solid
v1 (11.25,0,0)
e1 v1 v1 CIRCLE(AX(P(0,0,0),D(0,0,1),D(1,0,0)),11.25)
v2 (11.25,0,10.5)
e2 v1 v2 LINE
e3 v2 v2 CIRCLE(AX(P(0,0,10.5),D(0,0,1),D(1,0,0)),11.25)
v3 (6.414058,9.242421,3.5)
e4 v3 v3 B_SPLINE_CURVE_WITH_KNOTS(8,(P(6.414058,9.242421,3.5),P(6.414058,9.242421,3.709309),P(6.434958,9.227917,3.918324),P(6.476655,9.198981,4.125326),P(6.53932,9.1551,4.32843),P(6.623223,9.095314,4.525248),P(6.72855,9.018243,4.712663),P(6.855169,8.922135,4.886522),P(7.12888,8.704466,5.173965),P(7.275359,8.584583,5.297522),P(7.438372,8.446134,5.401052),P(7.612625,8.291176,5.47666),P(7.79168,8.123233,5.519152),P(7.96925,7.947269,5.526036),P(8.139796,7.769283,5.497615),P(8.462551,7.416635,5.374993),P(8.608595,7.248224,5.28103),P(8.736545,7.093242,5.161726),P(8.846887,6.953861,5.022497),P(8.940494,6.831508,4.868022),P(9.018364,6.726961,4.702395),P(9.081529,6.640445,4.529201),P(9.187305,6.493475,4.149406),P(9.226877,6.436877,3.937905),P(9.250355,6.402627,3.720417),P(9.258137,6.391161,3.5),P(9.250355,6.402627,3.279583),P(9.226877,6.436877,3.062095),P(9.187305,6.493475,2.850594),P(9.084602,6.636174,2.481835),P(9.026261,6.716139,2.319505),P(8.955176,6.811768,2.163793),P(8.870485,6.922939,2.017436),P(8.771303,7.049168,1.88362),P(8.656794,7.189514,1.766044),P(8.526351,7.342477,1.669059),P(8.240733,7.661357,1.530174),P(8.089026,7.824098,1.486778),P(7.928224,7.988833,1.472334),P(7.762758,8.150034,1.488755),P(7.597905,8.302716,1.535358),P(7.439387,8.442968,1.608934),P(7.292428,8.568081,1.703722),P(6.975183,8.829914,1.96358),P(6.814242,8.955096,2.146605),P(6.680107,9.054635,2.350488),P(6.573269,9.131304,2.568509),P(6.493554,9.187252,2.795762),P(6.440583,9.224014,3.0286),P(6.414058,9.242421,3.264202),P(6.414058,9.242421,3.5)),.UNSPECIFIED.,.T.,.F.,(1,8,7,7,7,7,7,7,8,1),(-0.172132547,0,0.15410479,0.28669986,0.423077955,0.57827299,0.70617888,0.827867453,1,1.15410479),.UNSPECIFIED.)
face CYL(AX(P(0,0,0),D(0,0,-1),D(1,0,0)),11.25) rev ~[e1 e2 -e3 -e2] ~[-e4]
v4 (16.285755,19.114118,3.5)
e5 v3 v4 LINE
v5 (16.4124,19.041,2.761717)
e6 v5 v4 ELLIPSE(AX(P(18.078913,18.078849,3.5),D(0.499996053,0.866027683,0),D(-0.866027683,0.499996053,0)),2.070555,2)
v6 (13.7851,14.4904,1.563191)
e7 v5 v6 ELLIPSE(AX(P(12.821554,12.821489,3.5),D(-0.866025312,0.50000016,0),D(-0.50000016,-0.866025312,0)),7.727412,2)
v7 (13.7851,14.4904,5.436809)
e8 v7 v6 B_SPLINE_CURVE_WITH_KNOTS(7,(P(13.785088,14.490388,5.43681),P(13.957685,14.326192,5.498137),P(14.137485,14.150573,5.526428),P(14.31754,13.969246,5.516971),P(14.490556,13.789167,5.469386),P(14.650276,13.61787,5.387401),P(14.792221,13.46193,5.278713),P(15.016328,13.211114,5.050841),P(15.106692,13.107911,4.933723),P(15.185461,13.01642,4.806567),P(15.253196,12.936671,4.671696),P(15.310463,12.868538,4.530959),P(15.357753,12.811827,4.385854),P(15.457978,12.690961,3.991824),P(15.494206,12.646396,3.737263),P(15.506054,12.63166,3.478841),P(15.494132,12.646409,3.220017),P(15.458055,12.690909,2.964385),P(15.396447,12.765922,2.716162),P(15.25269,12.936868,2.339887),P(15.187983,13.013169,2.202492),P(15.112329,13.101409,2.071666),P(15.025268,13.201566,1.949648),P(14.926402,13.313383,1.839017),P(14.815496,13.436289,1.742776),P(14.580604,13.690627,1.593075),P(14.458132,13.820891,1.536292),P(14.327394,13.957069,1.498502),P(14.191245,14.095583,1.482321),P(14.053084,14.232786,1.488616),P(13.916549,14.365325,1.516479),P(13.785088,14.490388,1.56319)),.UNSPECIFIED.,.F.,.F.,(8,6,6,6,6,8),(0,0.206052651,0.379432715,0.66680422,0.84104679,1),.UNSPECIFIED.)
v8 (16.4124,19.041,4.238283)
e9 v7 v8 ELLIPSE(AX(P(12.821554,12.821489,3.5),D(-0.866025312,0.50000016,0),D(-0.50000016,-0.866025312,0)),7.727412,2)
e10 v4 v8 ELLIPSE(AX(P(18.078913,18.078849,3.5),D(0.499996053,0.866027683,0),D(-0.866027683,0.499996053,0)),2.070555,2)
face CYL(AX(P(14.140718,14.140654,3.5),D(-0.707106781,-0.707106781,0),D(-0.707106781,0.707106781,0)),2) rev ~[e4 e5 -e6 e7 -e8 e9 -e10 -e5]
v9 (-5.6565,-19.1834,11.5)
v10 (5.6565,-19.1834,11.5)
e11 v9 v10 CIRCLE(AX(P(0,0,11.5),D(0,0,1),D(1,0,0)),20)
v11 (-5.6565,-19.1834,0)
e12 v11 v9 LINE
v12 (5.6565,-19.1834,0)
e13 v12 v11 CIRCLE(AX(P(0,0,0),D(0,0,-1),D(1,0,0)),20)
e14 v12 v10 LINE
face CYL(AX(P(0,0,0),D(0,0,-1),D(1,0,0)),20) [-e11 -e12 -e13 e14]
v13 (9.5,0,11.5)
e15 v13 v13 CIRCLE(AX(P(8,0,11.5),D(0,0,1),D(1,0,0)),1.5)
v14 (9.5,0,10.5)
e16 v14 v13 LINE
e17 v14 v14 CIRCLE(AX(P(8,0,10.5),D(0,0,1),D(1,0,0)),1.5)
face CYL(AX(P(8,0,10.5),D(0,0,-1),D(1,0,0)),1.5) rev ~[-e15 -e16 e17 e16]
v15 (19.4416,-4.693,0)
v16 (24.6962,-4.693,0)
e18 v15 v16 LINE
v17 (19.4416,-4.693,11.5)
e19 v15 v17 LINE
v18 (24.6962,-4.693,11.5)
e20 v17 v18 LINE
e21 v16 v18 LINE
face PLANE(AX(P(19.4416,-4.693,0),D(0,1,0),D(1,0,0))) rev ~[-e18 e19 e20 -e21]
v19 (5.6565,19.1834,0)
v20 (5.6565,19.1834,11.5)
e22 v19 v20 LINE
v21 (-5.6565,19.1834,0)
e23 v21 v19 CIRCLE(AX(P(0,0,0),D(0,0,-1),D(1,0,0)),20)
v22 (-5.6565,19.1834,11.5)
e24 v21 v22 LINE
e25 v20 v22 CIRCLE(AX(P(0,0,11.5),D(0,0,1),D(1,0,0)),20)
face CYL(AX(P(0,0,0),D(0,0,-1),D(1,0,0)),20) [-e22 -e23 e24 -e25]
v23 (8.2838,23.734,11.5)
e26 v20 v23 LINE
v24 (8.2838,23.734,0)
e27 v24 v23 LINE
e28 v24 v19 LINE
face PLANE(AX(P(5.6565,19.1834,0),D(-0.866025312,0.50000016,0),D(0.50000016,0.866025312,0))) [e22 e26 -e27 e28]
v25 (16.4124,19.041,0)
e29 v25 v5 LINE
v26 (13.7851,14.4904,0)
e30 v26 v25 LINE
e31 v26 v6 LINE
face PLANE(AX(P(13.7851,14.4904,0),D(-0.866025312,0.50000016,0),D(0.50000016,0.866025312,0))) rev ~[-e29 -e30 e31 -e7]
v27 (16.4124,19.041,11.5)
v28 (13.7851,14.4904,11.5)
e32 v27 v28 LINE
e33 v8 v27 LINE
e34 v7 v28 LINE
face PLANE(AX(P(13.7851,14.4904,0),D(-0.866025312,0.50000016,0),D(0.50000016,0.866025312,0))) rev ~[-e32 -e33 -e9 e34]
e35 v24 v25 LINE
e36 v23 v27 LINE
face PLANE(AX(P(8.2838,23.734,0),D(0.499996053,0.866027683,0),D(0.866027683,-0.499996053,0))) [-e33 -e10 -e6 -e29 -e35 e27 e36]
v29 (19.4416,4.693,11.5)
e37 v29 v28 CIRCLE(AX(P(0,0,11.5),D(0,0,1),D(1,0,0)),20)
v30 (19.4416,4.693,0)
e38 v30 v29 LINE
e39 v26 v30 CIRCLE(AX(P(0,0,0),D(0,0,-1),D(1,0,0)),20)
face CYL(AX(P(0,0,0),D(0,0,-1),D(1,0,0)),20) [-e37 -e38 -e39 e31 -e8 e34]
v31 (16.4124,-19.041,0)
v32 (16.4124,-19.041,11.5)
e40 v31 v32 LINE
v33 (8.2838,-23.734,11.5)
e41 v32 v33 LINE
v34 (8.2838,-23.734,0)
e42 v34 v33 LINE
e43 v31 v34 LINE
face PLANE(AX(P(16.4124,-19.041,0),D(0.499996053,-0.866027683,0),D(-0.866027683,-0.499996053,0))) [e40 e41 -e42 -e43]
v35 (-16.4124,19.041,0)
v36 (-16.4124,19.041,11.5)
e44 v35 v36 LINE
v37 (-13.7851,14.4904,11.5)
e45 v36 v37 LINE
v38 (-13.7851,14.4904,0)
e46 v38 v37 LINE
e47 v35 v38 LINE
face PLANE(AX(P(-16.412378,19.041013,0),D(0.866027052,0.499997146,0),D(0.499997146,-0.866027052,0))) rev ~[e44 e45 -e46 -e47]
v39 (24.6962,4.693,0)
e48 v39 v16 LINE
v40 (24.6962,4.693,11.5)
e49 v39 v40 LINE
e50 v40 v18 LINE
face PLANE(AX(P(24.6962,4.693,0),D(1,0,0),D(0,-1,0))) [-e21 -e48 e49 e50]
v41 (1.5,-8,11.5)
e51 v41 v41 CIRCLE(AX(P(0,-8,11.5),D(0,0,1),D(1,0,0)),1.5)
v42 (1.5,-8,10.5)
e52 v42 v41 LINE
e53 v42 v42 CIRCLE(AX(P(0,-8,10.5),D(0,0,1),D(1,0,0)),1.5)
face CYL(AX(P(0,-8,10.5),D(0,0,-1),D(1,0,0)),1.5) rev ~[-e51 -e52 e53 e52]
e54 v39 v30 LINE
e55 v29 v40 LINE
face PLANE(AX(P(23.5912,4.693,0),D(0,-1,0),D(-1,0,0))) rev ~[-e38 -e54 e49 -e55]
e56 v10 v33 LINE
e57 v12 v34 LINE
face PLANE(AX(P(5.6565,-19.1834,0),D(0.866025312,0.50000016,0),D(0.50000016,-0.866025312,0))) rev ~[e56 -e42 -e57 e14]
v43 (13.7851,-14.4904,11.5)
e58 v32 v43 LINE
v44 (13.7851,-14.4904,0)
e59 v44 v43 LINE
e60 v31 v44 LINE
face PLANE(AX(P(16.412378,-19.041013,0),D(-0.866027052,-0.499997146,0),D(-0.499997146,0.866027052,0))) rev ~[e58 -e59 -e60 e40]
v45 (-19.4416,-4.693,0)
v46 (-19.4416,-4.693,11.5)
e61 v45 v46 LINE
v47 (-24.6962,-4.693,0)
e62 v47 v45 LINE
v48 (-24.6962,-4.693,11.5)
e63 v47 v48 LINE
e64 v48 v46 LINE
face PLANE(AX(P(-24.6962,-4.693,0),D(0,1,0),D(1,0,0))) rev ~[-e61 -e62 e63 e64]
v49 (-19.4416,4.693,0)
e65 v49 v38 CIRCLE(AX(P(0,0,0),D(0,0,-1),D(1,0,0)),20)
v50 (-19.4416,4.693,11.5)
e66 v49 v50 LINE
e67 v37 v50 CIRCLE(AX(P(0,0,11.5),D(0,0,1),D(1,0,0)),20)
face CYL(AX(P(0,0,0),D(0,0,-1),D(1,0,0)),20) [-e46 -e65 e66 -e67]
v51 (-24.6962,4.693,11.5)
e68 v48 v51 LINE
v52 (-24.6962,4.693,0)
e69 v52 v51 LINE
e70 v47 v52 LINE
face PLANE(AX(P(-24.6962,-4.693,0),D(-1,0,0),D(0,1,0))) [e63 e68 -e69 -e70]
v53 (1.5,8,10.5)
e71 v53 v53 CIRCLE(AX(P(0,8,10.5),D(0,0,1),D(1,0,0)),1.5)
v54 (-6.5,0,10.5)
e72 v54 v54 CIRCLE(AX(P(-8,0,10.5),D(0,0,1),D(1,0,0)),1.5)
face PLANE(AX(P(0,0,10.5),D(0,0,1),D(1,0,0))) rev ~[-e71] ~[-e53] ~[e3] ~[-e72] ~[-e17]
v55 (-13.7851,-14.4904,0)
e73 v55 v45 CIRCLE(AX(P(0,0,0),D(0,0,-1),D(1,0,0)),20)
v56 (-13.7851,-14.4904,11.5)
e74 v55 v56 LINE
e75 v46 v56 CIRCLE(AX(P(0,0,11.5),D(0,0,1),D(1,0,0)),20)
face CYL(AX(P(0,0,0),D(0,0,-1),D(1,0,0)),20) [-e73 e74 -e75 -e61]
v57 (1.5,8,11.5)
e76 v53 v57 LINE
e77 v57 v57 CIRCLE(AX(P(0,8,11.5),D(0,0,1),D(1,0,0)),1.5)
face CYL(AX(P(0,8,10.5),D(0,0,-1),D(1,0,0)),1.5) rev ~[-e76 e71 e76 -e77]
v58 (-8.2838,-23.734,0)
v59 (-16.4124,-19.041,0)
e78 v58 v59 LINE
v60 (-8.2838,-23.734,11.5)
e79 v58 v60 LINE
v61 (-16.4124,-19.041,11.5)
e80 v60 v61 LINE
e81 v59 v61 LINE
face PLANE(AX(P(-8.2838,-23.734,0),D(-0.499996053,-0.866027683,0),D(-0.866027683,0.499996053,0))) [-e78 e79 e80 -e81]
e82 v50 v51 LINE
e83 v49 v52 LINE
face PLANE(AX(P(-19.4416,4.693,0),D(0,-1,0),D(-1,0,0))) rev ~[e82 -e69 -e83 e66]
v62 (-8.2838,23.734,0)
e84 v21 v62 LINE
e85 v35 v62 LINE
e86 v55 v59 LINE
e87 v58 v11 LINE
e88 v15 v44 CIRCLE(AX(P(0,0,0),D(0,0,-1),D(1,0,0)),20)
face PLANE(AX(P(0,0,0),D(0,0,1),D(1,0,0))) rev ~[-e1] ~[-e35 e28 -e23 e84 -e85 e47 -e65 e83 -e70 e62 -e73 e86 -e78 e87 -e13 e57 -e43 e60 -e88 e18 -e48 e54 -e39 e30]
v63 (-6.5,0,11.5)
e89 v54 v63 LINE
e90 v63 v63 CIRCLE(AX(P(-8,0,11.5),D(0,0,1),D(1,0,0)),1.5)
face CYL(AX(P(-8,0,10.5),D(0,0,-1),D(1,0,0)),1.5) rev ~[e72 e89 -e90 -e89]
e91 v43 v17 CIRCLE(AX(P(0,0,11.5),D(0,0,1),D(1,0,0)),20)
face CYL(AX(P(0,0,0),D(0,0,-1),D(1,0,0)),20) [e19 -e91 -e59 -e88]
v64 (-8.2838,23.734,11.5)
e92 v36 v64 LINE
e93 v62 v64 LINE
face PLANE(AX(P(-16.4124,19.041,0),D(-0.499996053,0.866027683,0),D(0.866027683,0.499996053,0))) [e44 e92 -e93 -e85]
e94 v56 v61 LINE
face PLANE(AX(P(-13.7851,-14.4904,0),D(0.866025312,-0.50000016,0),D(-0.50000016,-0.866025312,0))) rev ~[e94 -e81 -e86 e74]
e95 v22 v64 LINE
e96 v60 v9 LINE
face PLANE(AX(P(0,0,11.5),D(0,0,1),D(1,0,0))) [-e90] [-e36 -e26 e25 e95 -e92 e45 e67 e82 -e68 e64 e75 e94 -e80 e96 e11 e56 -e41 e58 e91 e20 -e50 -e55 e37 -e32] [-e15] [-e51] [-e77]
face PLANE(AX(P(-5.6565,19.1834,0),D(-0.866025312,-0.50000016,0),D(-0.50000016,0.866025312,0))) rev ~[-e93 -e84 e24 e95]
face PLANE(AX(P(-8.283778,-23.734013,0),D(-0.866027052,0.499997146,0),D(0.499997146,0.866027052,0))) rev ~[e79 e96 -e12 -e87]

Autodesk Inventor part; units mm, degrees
ref_plane "YZ Plane" through (0, 0, 0) normal (1, 0, 0) x (0, 1, 0)
sketch "Эскиз1" plane through (0, 0, 0) normal (0, 0, 1) x (1, 0, 0)
  line L0 (0, 0) -> (34.5691, 5.4752) construction
  line L1 (0, 0) -> (35, 0) construction
  line L2 (0, 0) -> (34.5691, -5.4752) construction
  circle A0 centre (0, 0) radius 11.25
  circle A1 centre (0, 0) radius 15
  circle A2 centre (0, 0) radius 20
  circle A3 centre (0, 0) radius 30.0525
  circle A4 centre (0, 0) radius 32.0038
  circle A5 centre (0, 0) radius 35
  line L3 (0, 0) -> (17.5, -30.3109) construction
  circle A6 centre (0, -8) radius 1.5
  circle A7 centre (-8, 0) radius 1.5
  line L4 (0, 0) -> (-35, 0) construction
  line L5 (-29.6307, -4.693) -> (-19.4416, -4.693) construction
  line L6 (-29.6307, -4.693) -> (-19.4416, -4.693)
  line L7 (-29.6839, -4.693) -> (-29.6839, 4.693)
  line L8 (-19.4416, 4.693) -> (-34.6839, 4.693) construction
  line L9 (-19.4416, -4.693) -> (-34.6839, -4.693) construction
  line L10 (10.751, 28.0074) -> (5.6565, 19.1834) construction
  line L11 (5.6565, 19.1834) -> (13.2777, 32.3837) construction
  line L12 (-5.6565, 19.1834) -> (-13.2777, 32.3837) construction
  circle A8 centre (0, 8) radius 1.5
  line L13 (0, 0) -> (-17.5, 30.3109) construction
  line L14 (-5.6565, 19.1834) -> (-13.2777, 32.3837)
  line L15 (0, 0) -> (17.5, 30.3109) construction
  line L16 (0, 0) -> (-17.5, -30.3109) construction
  line L17 (5.6565, 19.1834) -> (13.2777, 32.3837)
  line L18 (13.3758, 26.5536) -> (16.0133, 31.1219)
  line L19 (16.3082, 24.8605) -> (18.9457, 29.4289)
  line L20 (18.9457, 29.4289) -> (17.4457, 26.8308) construction
  line L21 (29.6307, 4.693) -> (19.4416, 4.693)
  line L22 (18.8796, -23.3144) -> (13.7851, -14.4904) construction
  line L23 (13.7851, -14.4904) -> (21.4063, -27.6907) construction
  line L24 (29.6839, 4.693) -> (29.6839, 1.693)
  line L25 (29.6839, 4.693) -> (29.6839, -4.693)
  line L26 (29.6839, -4.693) -> (29.6839, -1.693) construction
  circle A9 centre (8, 0) radius 1.5
  line L27 (-18.8796, 23.3144) -> (-13.7851, 14.4904) construction
  line L28 (-13.7851, 14.4904) -> (-21.4063, 27.6907) construction
  line L29 (-18.8796, 23.3144) -> (-13.7851, 14.4904)
  line L30 (-13.7851, 14.4904) -> (-21.4063, 27.6907)
  line L31 (-18.9063, 23.3605) -> (-10.7777, 28.0536)
  line L32 (-16.3082, 24.8605) -> (-18.9457, 29.4289)
  line L33 (-13.3758, 26.5536) -> (-16.0133, 31.1219)
  line L34 (-13.7851, -14.4904) -> (-21.4063, -27.6907) construction
  line L35 (-10.751, -28.0074) -> (-5.6565, -19.1834) construction
  line L36 (-13.7851, -14.4904) -> (-21.4063, -27.6907)
  line L37 (-10.751, -28.0074) -> (-5.6565, -19.1834)
  line L38 (13.7851, 14.4904) -> (21.4063, 27.6907) construction
  line L39 (21.4063, 27.6907) -> (20.1674, 25.5449) construction
  line L40 (10.7777, 28.0536) -> (18.9063, 23.3605)
  line L41 (13.7851, 14.4904) -> (21.4063, 27.6907)
  line L42 (10.751, 28.0074) -> (5.6565, 19.1834)
  line L43 (0, 0) -> (21.2118, 27.8399) construction
  line L44 (0, 0) -> (8, 0) construction
  line L45 (0, 0) -> (0, 8) construction
  line L46 (-10.7777, -28.0536) -> (-18.9063, -23.3605)
  line L47 (-13.3758, -26.5536) -> (-16.0133, -31.1219)
  line L48 (-16.3082, -24.8605) -> (-18.9457, -29.4289)
  line L49 (-5.6565, -19.1834) -> (-13.2777, -32.3837) construction
  line L50 (5.6565, -19.1834) -> (13.2777, -32.3837) construction
  line L51 (-5.6565, -19.1834) -> (-13.2777, -32.3837)
  line L52 (18.8796, -23.3144) -> (13.7851, -14.4904)
  line L53 (5.6565, -19.1834) -> (13.2777, -32.3837)
  line L54 (16.3082, -24.8605) -> (18.9457, -29.4289)
  line L55 (13.7851, -14.4904) -> (21.4063, -27.6907)
  line L56 (13.3758, -26.5536) -> (16.0133, -31.1219)
  line L57 (18.9063, -23.3605) -> (10.7777, -28.0536)
  line L58 (27.6414, 16.1308) -> (28.831, 19.8437)
  line L59 (24.938, 20.0584) -> (28.831, 19.8437)
  line L60 (24.7499, 20.2901) -> (25.3388, 24.1443)
  line L61 (21.4607, 23.742) -> (25.3388, 24.1443)
  line L62 (17.4457, 26.8308) -> (21.2118, 27.8399)
  line L63 (21.2384, 23.9411) -> (21.2118, 27.8399)
  line L64 (-19.4416, 4.693) -> (-34.6839, 4.693)
  line L65 (-17.4453, 26.8311) -> (-21.2113, 27.8403)
  line L66 (-21.238, 23.9415) -> (-21.2113, 27.8403)
  line L67 (-21.4603, 23.7424) -> (-25.3384, 24.1447)
  line L68 (-24.7496, 20.2905) -> (-25.3384, 24.1447)
  line L69 (-24.9377, 20.0588) -> (-28.8307, 19.8442)
  line L70 (-27.6411, 16.1312) -> (-28.8307, 19.8442)
  line L71 (-27.7903, 15.8727) -> (-31.6007, 15.0465)
  line L72 (-29.8401, 11.5678) -> (-31.6007, 15.0465)
  line L73 (-29.9467, 11.289) -> (-33.5789, 9.8719)
  line L74 (-31.2916, 6.7145) -> (-33.5789, 9.8719)
  line L75 (-31.3528, 6.4224) -> (-34.716, 4.45)
  line L76 (-29.6839, -1.693) -> (-34.959, -1.693)
  line L77 (-19.4416, -4.693) -> (-34.6839, -4.693)
  line L78 (-29.6839, 1.693) -> (-34.959, 1.693)
  line L79 (-31.959, 1.693) -> (-34.716, 4.45)
  line L80 (-31.9591, -1.6925) -> (-34.716, -4.4494)
  line L81 (-31.3529, -6.4219) -> (-34.716, -4.4494)
  line L82 (-31.2917, -6.714) -> (-33.5791, -9.8714)
  line L83 (-29.9469, -11.2885) -> (-33.5791, -9.8714)
  line L84 (-29.8403, -11.5673) -> (-31.6009, -15.046)
  line L85 (-27.7906, -15.8723) -> (-31.6009, -15.046)
  line L86 (-24.938, -20.0584) -> (-28.831, -19.8437)
  line L87 (-27.6414, -16.1308) -> (-28.831, -19.8437)
  line L88 (-17.4457, -26.8308) -> (-21.2118, -27.8399)
  line L89 (-21.2384, -23.9411) -> (-21.2118, -27.8399)
  line L90 (-21.4607, -23.742) -> (-25.3388, -24.1443)
  line L91 (-24.7499, -20.2901) -> (-25.3388, -24.1443)
  line L92 (-14.5138, -28.5236) -> (-13.5047, -32.2897)
  line L93 (-10.1149, -30.3634) -> (-13.5047, -32.2897)
  line L94 (-9.8313, -30.4564) -> (-8.2407, -34.016)
  line L95 (-5.1973, -31.579) -> (-8.2407, -34.016)
  line L96 (-4.9026, -31.6261) -> (-2.7702, -34.8902)
  line L97 (-0.1495, -32.0035) -> (-2.7702, -34.8902)
  line L98 (0.149, -32.0035) -> (2.7697, -34.8902)
  line L99 (-14.5133, 28.5238) -> (-13.5042, 32.2899)
  line L100 (-10.1144, 30.3635) -> (-13.5042, 32.2899)
  line L101 (-9.8308, 30.4565) -> (-8.2401, 34.0162)
  line L102 (-5.1968, 31.5791) -> (-8.2401, 34.0162)
  line L103 (14.5138, 28.5236) -> (13.5047, 32.2897)
  line L104 (10.1149, 30.3634) -> (13.5047, 32.2897)
  line L105 (9.8313, 30.4564) -> (8.2407, 34.016)
  line L106 (5.1973, 31.579) -> (8.2407, 34.016)
  line L107 (4.9026, 31.6261) -> (2.7702, 34.8902)
  line L108 (0.1495, 32.0035) -> (2.7702, 34.8902)
  line L109 (-4.9021, 31.6262) -> (-2.7697, 34.8902)
  line L110 (-0.149, 32.0035) -> (-2.7697, 34.8902)
  line L111 (14.5133, -28.5238) -> (13.5042, -32.2899)
  line L112 (5.1968, -31.5791) -> (8.2401, -34.0162)
  line L113 (9.8308, -30.4565) -> (8.2401, -34.0162)
  line L114 (10.1144, -30.3635) -> (13.5042, -32.2899)
  line L115 (17.4453, -26.8311) -> (21.2113, -27.8403)
  line L116 (21.238, -23.9415) -> (21.2113, -27.8403)
  line L117 (4.9021, -31.6262) -> (2.7697, -34.8902)
  line L118 (19.4416, -4.693) -> (34.6839, -4.693)
  line L119 (29.6839, -1.693) -> (34.959, -1.693)
  line L120 (21.4603, -23.7424) -> (25.3384, -24.1447)
  line L121 (24.7496, -20.2905) -> (25.3384, -24.1447)
  line L122 (24.9377, -20.0588) -> (28.8307, -19.8442)
  line L123 (27.6411, -16.1312) -> (28.8307, -19.8442)
  line L124 (27.7903, -15.8727) -> (31.6007, -15.0465)
  line L125 (29.9467, -11.289) -> (33.5789, -9.8719)
  line L126 (31.2916, -6.7145) -> (33.5789, -9.8719)
  line L127 (31.3528, -6.4224) -> (34.716, -4.45)
  line L128 (31.959, -1.693) -> (34.716, -4.45)
  line L129 (29.8401, -11.5678) -> (31.6007, -15.0465)
  line L130 (34.5691, 5.4752) -> (29.6307, 4.693) construction
  line L131 (19.4416, 4.693) -> (34.6839, 4.693)
  line L132 (34.6839, 4.693) -> (29.6839, 4.693) construction
  line L133 (29.6839, 1.693) -> (34.959, 1.693)
  line L134 (29.8403, 11.5673) -> (31.6009, 15.046)
  line L135 (31.2917, 6.714) -> (33.5791, 9.8714)
  line L136 (31.9591, 1.6925) -> (34.716, 4.4494)
  line L137 (31.3529, 6.4219) -> (34.716, 4.4494)
  line L138 (29.9469, 11.2885) -> (33.5791, 9.8714)
  line L139 (27.7906, 15.8723) -> (31.6009, 15.046)
  circle A10 centre (0, 0) radius 36.5
  line L140 (0, 0) -> (-24.7487, 24.7487) construction
  line L141 (0, 0) -> (35, 0) construction
  line L142 (0, 0) -> (-24.6962, 0) construction
  line L143 (-24.6962, -4.693) -> (-24.6962, 4.693)
  line L144 (-8.2838, -23.734) -> (-16.4124, -19.041)
  line L145 (16.4124, -19.041) -> (8.2838, -23.734)
  line L146 (24.6962, 4.693) -> (24.6962, -4.693)
  line L147 (8.2838, 23.734) -> (16.4124, 19.041)
  line L148 (-16.4124, 19.041) -> (-8.2838, 23.734)
  line L149 (0, 0) -> (21.2503, 21.2503) construction
  line L150 (0, 0) -> (30.0525, 0) construction
  line L151 (14.1421, 14.1421) -> (23.5912, 4.693)
  line L152 (23.5912, 4.693) -> (-6.168, 34.4522)
  point P0 (0, 0)
  point P1 (18.9062, 23.3604)
  point P2 (18.9055, 23.3609)
  point P3 (10.7784, 28.0531)
  point P4 (-10.7784, 28.0531)
  point P5 (-18.9055, 23.3609)
  point P6 (-18.9062, 23.3604)
  point P7 (-29.6838, 4.693)
  point P8 (-29.6839, 4.6922)
  point P9 (-29.6839, -4.6922)
  point P10 (-18.9055, -23.3609)
  point P11 (-10.7784, -28.0531)
  point P12 (-10.7776, -28.0534)
  point P13 (10.7776, -28.0534)
  point P14 (10.7784, -28.0531)
  point P15 (18.9055, -23.3609)
  point P16 (29.6839, -4.6922)
  point P17 (29.6839, 4.6922)
  point P18 (29.6838, 4.693)
  point P19 (-29.6838, -4.693)
  point P20 (-18.9062, -23.3604)
  point P21 (18.9062, -23.3604)
  point P22 (29.6838, -4.693)
  point P23 (10.7776, 28.0534)
  point P24 (-10.7776, 28.0534)
  point P25 (-24.6962, 4.693)
  point P26 (24.6962, -4.693)
  dimension "d10" = 70
  dimension "d21" = 60.105
  dimension "d11" = 40
  dimension "d12" = 9
  dimension "d13" = 5
  dimension "d14" = 360
  dimension "d15" = 360
  dimension "d16" = 5
  dimension "d17" = 90
  dimension "d18" = 3
  dimension "d19" = 3
  dimension "d20" = 360
  dimension "d22" = 3
  dimension "d23" = 45
  dimension "d24" = 45.392
  dimension "d25" = 360
  dimension "d26" = 22.5
  dimension "d27" = 8
  dimension "d28" = 3
  dimension "d29" = 8
  dimension "d30" = 3
  dimension "d31" = 30
  dimension "d32" = 73
  dimension "d45" = 135
  dimension "d48" = 360
  dimension "d54" = 45
extrude "Выдавливание1" add sketch "Эскиз1" along normal blind 10.5 contours A1 | A2
extrude "Выдавливание4" add sketch "Эскиз1" along normal blind 1 from surface at 10.5 contours A0 | A1 | A2
ref_plane "РабПлоскость1" through (-24.7024, -23.7395, 10.5) normal (0, 0, 1) x (1, 0, 0)
ref_plane "РабПлоскость2" through (-24.7024, -23.7395, 9) normal (0, 0, -1) x (0, 1, 0)
extrude "Выдавливание7" add sketch "Эскиз1" along normal blind 11.5 contours A2 L21 L146 L118 | L52 L145 L53 A2 | A2 L17 L152 L41 | L152 L17 L147 L41 | L37 L144 L36 A2 | A2 L29 L148 L14 | L6 L143 L64 A2
ref_plane "РабПлоскость3" through (23.5912, 4.693, 0) normal (0.7071068, 0.7071068, 0) x (-0.7071068, 0.7071068, 0)
sketch "Эскиз2" plane through (23.5912, 4.693, 0) normal (0.7071068, 0.7071068, 0) x (-0.7071068, 0.7071068, 0)
  line L0 (13.363, 0) -> (13.363, 3.5)
  line L1 (13.8618, 0) -> (13.8618, 11.5) projected
  line L2 (13.363, 0) -> (16.863, 0) construction
  circle A0 centre (13.363, 3.5) radius 2
  dimension "d56" = 3.5
  dimension "d57" = 90
  dimension "d58" = 4
extrude "Выдавливание8" cut sketch "Эскиз2" along normal blind 5.1 and the other way blind 9
properties part number "inside_part_wheel"
